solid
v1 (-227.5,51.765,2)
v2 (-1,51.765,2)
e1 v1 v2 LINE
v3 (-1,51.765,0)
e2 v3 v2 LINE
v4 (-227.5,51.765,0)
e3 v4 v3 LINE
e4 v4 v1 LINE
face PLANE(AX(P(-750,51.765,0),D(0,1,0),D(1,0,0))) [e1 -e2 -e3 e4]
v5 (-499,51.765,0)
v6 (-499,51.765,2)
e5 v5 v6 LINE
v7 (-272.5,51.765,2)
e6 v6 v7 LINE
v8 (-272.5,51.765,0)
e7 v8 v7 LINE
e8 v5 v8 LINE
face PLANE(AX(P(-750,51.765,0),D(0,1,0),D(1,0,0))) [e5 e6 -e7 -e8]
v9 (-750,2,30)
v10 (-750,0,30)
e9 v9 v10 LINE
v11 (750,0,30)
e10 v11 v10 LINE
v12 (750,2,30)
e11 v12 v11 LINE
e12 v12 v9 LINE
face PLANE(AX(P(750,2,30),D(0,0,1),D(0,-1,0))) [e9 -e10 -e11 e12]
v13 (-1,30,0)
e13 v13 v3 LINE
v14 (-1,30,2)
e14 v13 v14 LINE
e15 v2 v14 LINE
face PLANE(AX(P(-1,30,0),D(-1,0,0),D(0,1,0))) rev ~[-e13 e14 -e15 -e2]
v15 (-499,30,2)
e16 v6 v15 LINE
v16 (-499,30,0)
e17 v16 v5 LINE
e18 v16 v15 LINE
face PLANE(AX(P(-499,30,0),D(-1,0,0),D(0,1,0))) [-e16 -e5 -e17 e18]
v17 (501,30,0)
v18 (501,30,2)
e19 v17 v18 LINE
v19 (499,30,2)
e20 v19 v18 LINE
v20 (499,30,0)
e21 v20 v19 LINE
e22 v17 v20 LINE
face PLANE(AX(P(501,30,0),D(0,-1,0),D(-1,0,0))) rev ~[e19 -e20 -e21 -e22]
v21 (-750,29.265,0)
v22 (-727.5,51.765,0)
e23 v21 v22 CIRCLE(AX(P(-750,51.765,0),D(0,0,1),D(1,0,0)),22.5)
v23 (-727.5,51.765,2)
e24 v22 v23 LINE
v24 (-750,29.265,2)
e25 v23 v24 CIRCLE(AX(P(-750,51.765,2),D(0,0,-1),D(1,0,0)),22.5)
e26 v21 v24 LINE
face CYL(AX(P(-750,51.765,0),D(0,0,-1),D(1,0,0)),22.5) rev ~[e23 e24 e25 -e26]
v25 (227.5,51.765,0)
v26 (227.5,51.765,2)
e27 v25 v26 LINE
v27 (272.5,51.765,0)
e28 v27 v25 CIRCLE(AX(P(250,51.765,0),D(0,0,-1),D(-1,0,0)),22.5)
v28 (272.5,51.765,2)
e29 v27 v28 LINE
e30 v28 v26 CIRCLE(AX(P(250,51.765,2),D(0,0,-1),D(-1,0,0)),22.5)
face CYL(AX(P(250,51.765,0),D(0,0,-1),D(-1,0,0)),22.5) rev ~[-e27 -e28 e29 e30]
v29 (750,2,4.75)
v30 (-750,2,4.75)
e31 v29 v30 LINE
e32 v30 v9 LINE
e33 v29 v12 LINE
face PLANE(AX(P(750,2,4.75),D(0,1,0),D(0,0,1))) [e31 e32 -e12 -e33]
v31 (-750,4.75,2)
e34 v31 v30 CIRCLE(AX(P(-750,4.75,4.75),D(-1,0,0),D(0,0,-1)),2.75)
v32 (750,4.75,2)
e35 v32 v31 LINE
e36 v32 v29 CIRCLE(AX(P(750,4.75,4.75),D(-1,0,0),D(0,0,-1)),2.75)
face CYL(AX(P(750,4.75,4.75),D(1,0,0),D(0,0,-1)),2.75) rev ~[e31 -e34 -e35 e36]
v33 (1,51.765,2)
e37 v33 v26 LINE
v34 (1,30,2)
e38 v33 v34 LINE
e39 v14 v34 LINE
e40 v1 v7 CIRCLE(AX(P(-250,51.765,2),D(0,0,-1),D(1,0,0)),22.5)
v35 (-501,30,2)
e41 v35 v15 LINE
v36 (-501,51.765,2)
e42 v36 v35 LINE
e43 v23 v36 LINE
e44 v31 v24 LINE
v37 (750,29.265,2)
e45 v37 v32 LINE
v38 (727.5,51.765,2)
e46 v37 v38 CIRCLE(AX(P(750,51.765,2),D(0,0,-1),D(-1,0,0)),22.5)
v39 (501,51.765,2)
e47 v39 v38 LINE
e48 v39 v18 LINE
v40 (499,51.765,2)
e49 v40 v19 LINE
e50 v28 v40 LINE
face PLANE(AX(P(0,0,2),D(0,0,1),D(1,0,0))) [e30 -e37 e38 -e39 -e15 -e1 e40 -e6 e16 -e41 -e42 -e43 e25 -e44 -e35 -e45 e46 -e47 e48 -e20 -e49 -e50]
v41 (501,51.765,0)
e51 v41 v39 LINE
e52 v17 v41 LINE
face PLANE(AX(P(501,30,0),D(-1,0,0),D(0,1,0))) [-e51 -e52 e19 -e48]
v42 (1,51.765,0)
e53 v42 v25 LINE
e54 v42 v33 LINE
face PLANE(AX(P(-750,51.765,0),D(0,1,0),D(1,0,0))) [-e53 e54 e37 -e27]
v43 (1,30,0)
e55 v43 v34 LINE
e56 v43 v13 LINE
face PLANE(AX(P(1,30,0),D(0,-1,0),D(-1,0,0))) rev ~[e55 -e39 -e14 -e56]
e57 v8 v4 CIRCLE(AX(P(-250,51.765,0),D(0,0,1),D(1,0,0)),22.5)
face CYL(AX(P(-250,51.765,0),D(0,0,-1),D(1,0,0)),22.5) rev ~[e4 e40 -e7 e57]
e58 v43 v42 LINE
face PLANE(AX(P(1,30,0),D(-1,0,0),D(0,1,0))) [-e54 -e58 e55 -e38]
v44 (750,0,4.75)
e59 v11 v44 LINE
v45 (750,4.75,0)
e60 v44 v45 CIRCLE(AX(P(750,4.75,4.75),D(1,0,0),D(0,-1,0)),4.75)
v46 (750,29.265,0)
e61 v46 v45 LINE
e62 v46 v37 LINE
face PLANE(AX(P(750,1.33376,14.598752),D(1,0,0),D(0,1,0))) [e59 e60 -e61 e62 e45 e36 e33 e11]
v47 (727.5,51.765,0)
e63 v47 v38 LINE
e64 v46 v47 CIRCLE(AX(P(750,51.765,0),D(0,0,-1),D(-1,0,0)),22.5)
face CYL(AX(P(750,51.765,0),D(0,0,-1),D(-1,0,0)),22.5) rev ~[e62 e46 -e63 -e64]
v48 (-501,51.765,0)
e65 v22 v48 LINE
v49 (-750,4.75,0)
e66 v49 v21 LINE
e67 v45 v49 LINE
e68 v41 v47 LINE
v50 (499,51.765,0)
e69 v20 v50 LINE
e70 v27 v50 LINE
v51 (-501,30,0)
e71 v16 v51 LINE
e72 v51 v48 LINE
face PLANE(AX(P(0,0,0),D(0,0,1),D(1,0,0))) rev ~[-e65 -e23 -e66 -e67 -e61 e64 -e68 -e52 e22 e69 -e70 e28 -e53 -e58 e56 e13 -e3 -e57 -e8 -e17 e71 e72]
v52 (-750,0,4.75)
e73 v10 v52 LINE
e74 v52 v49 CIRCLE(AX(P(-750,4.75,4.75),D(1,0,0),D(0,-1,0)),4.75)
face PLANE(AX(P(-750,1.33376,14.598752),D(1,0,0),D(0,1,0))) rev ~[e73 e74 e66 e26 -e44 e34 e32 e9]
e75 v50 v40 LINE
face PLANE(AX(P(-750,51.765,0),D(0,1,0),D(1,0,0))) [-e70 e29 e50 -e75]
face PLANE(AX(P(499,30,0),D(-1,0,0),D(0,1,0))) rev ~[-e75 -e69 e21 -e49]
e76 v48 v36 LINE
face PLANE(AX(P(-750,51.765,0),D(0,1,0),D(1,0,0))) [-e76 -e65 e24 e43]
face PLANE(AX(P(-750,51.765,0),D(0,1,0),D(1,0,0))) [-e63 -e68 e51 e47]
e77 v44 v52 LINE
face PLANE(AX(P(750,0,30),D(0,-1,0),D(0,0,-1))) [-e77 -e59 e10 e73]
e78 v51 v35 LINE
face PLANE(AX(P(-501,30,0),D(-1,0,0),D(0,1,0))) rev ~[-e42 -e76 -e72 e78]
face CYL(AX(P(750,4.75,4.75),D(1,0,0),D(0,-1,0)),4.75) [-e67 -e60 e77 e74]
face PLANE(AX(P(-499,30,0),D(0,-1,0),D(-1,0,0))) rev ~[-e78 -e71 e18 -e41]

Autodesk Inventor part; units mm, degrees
ref_plane "YZ Plane" through (0, 0, 0) normal (1, 0, 0) x (0, 1, 0)
ref_plane "XZ Plane" through (0, 0, 0) normal (0, 1, 0) x (-1, 0, 0)
ref_plane "XY Plane" through (0, 0, 0) normal (0, 0, 1) x (1, 0, 0)
sketch "Sketch1" plane through (0, 0, 0) normal (0, 0, 1) x (1, 0, 0)
  line L0 (-750, 51.765) -> (750, 51.765)
  line L1 (750, 51.765) -> (750, 0)
  line L2 (750, 0) -> (-750, 0)
  line L3 (-750, 0) -> (-750, 51.765)
  point P0 (0, 0)
  point P1 (0, 0)
  dimension "d0" = 1500
  dimension "d1" = 51.765
extrude "Plate1" add sketch "Sketch1" along normal blind 2
sketch "Sketch2" plane through (750, 2, 0) normal (0, -1, 0) x (1, 0, 0)
  line L0 (-1500, 0) -> (0, 0)
  line L1 (0, 0) -> (0, 30)
  line L2 (0, 30) -> (-1500, 30)
  line L3 (-1500, 30) -> (-1500, 0)
edge flange "Flange1" height 30 angle 90 thickness 2 bend radius 2.75 thickness toward (0, -1, 0) relief round relief width 2 relief depth 1 edges at (0, 0, 2) wall of the first edge with corners at (-750, 2, 0) (750, 2, 0) (750, 2, 30) (-750, 2, 30)
bend "Bend1"
corner "Corner1"
sketch "Sketch5" plane through (0, 0, 0) normal (0, 0, -1) x (-1, 0, 0)
  line L0 (750, 51.765) -> (-750, 51.765) projected
  line L1 (-1, 30) -> (-1, 51.765)
  line L2 (750, 0) -> (-750, 0) projected
  line L3 (-1, 30) -> (1, 30)
  line L4 (1, 30) -> (1, 51.765)
  point P0 (0, 0)
  point P1 (0, 30)
  point P2 (0, 0)
  dimension "d27" = 2
  dimension "d29" = 30
extrude "Extrusion1" cut sketch "Sketch5" against normal through all
pattern_linear "Rectangular Pattern1" count 3 spacing 500 along (1, 0, 0) of "Extrusion1" first direction both ways yes
sketch "Sketch6" plane through (0, 0, 0) normal (0, 0, -1) x (-1, 0, 0)
  line L0 (-750, 51.765) -> (-750, 4.75) projected
  circle A0 centre (-750, 51.765) radius 22.5
  line L1 (-750, 51.765) -> (750, 51.765) projected
  line L2 (-499, 30) -> (-501, 30) construction
  line L3 (-499, 30) -> (-1, 30) construction
  line L4 (-1, 30) -> (-1, 51.765) construction
  line L5 (-1, 51.765) -> (-499, 51.765) projected
  circle A1 centre (-250, 51.765) radius 22.5
  point P0 (0, 0)
  point P1 (-727.5, 51.765)
  point P2 (-750, 29.265)
  point P3 (-250, 30)
  point P4 (-227.5, 51.765)
  point P5 (-272.5, 51.765)
  dimension "d24" = 45
extrude "Extrusion2" cut sketch "Sketch6" against normal through all contours L1 A0 L0 | L1 A1 picked at (-748.3311, 36.953) picked at (-248.2369, 40.8343)
mirror "Mirror1" about plane through (0, 0, 0) normal (1, 0, 0) of "Extrusion2"
sketch "Sketch7" plane through (0, 0, 2) normal (0, 0, 1) x (1, 0, 0)
  arc A0 (-750, 29.265) -> (-727.5, 51.765) centre (-750, 51.765) ccw projected
  line L0 (-750, 4.75) -> (-750, 29.265) projected
  line L1 (-750, 4.75) -> (750, 4.75) projected
  line L2 (750, 29.265) -> (750, 4.75) projected
  arc A1 (727.5, 51.765) -> (750, 29.265) centre (750, 51.765) ccw projected
  line L3 (501, 51.765) -> (727.5, 51.765) projected
  line L4 (501, 51.765) -> (501, 30) projected
  line L5 (501, 30) -> (499, 30) projected
  line L6 (499, 30) -> (499, 51.765) projected
  line L7 (1, 51.765) -> (227.5, 51.765) projected
  line L8 (1, 51.765) -> (1, 30) projected
  line L9 (1, 30) -> (-1, 30) projected
  line L10 (-1, 30) -> (-1, 51.765) projected
  line L11 (-499, 51.765) -> (-272.5, 51.765) projected
  line L12 (-499, 51.765) -> (-499, 30) projected
  line L13 (-499, 30) -> (-501, 30) projected
  line L14 (-501, 30) -> (-501, 51.765) projected
  line L15 (-727.5, 51.765) -> (-501, 51.765) projected
  line L16 (649, 50.765) -> (651, 50.765)
  line L17 (651, 50.765) -> (651, 51.765)
  line L18 (651, 51.765) -> (649, 51.765)
  line L19 (649, 51.765) -> (649, 50.765)
  line L20 (650, 4.75) -> (650, 51.765) construction
  line L21 (272.5, 51.765) -> (499, 51.765) projected
  arc A2 (227.5, 51.765) -> (272.5, 51.765) centre (250, 51.765) ccw projected
  line L22 (-227.5, 51.765) -> (-1, 51.765) projected
  arc A3 (-272.5, 51.765) -> (-227.5, 51.765) centre (-250, 51.765) ccw projected
  point P0 (0, 0)
  point P1 (650, 50.765)
  point P2 (649, 51.265)
  point P3 (650, 28.2575)
  dimension "d30" = 2
  dimension "d31" = 1
  dimension "d33" = 100
extrude "Extrusion3" [suppressed]
mirror "Mirror2" [suppressed]
sketch "Sketch9" plane through (0, 0, 2) normal (0, 0, 1) x (1, 0, 0)
  line L0 (494, 46.765) -> (494, 34.765) construction
  line L1 (494, 34.765) -> (294, 34.765) construction
  line L2 (294, 34.765) -> (294, 46.765) construction
  line L3 (294, 46.765) -> (494, 46.765) construction
  line L4 (499, 30) -> (499, 51.765) projected
  line L5 (1, 51.765) -> (499, 51.765) projected
  point P0 (0, 0)
  dimension "d38" = 200
  dimension "d39" = 12
  dimension "d42" = 5
  dimension "d43" = 5
mark "Mark3"
equation "\"d1\" = Стрингер_1"
equation "\"d27\" = d18"
equation "\"d29\" = Стрингер_глубина_паза"
equation "\"d43\" = d42"
equation "\"d2\" = Thickness"
equation "\"d3\" = BendReliefWidth"
equation "\"d4\" = BendReliefDepth"
equation "\"d5\" = MinimumRemnant"
equation "\"d6\" = TransitionRadius"
equation "\"d9\" = BendRadius"
equation "\"d10\" = CornerReliefSize"
equation "\"d11\" = GapSize"
equation "\"d12\" = JacobiRadiusSize"
equation "\"BendReliefWidth\" = Thickness"
equation "\"BendReliefDepth\" = 0.5 * Thickness"
equation "\"CornerReliefSize\" = 4 * Thickness"
equation "\"MinimumRemnant\" = 2 * Thickness"
equation "\"TransitionRadius\" = BendRadius"
equation "\"JacobiRadiusSize\" = BendRadius"
equation "\"GapSize\" = Thickness"
equation "\"d18\" = Thickness"
equation "\"qqqqqq\" = 67.35706"
equation "\"Стрингер_1\" = 51.765032"
equation "\"Стрингер_глубина_паза\" = 30"
equation "\"Thickness\" = 2"
equation "\"BendRadius\" = 2.75"
properties part number "МОО 061 stringer back^" material "Stainless Steel"
